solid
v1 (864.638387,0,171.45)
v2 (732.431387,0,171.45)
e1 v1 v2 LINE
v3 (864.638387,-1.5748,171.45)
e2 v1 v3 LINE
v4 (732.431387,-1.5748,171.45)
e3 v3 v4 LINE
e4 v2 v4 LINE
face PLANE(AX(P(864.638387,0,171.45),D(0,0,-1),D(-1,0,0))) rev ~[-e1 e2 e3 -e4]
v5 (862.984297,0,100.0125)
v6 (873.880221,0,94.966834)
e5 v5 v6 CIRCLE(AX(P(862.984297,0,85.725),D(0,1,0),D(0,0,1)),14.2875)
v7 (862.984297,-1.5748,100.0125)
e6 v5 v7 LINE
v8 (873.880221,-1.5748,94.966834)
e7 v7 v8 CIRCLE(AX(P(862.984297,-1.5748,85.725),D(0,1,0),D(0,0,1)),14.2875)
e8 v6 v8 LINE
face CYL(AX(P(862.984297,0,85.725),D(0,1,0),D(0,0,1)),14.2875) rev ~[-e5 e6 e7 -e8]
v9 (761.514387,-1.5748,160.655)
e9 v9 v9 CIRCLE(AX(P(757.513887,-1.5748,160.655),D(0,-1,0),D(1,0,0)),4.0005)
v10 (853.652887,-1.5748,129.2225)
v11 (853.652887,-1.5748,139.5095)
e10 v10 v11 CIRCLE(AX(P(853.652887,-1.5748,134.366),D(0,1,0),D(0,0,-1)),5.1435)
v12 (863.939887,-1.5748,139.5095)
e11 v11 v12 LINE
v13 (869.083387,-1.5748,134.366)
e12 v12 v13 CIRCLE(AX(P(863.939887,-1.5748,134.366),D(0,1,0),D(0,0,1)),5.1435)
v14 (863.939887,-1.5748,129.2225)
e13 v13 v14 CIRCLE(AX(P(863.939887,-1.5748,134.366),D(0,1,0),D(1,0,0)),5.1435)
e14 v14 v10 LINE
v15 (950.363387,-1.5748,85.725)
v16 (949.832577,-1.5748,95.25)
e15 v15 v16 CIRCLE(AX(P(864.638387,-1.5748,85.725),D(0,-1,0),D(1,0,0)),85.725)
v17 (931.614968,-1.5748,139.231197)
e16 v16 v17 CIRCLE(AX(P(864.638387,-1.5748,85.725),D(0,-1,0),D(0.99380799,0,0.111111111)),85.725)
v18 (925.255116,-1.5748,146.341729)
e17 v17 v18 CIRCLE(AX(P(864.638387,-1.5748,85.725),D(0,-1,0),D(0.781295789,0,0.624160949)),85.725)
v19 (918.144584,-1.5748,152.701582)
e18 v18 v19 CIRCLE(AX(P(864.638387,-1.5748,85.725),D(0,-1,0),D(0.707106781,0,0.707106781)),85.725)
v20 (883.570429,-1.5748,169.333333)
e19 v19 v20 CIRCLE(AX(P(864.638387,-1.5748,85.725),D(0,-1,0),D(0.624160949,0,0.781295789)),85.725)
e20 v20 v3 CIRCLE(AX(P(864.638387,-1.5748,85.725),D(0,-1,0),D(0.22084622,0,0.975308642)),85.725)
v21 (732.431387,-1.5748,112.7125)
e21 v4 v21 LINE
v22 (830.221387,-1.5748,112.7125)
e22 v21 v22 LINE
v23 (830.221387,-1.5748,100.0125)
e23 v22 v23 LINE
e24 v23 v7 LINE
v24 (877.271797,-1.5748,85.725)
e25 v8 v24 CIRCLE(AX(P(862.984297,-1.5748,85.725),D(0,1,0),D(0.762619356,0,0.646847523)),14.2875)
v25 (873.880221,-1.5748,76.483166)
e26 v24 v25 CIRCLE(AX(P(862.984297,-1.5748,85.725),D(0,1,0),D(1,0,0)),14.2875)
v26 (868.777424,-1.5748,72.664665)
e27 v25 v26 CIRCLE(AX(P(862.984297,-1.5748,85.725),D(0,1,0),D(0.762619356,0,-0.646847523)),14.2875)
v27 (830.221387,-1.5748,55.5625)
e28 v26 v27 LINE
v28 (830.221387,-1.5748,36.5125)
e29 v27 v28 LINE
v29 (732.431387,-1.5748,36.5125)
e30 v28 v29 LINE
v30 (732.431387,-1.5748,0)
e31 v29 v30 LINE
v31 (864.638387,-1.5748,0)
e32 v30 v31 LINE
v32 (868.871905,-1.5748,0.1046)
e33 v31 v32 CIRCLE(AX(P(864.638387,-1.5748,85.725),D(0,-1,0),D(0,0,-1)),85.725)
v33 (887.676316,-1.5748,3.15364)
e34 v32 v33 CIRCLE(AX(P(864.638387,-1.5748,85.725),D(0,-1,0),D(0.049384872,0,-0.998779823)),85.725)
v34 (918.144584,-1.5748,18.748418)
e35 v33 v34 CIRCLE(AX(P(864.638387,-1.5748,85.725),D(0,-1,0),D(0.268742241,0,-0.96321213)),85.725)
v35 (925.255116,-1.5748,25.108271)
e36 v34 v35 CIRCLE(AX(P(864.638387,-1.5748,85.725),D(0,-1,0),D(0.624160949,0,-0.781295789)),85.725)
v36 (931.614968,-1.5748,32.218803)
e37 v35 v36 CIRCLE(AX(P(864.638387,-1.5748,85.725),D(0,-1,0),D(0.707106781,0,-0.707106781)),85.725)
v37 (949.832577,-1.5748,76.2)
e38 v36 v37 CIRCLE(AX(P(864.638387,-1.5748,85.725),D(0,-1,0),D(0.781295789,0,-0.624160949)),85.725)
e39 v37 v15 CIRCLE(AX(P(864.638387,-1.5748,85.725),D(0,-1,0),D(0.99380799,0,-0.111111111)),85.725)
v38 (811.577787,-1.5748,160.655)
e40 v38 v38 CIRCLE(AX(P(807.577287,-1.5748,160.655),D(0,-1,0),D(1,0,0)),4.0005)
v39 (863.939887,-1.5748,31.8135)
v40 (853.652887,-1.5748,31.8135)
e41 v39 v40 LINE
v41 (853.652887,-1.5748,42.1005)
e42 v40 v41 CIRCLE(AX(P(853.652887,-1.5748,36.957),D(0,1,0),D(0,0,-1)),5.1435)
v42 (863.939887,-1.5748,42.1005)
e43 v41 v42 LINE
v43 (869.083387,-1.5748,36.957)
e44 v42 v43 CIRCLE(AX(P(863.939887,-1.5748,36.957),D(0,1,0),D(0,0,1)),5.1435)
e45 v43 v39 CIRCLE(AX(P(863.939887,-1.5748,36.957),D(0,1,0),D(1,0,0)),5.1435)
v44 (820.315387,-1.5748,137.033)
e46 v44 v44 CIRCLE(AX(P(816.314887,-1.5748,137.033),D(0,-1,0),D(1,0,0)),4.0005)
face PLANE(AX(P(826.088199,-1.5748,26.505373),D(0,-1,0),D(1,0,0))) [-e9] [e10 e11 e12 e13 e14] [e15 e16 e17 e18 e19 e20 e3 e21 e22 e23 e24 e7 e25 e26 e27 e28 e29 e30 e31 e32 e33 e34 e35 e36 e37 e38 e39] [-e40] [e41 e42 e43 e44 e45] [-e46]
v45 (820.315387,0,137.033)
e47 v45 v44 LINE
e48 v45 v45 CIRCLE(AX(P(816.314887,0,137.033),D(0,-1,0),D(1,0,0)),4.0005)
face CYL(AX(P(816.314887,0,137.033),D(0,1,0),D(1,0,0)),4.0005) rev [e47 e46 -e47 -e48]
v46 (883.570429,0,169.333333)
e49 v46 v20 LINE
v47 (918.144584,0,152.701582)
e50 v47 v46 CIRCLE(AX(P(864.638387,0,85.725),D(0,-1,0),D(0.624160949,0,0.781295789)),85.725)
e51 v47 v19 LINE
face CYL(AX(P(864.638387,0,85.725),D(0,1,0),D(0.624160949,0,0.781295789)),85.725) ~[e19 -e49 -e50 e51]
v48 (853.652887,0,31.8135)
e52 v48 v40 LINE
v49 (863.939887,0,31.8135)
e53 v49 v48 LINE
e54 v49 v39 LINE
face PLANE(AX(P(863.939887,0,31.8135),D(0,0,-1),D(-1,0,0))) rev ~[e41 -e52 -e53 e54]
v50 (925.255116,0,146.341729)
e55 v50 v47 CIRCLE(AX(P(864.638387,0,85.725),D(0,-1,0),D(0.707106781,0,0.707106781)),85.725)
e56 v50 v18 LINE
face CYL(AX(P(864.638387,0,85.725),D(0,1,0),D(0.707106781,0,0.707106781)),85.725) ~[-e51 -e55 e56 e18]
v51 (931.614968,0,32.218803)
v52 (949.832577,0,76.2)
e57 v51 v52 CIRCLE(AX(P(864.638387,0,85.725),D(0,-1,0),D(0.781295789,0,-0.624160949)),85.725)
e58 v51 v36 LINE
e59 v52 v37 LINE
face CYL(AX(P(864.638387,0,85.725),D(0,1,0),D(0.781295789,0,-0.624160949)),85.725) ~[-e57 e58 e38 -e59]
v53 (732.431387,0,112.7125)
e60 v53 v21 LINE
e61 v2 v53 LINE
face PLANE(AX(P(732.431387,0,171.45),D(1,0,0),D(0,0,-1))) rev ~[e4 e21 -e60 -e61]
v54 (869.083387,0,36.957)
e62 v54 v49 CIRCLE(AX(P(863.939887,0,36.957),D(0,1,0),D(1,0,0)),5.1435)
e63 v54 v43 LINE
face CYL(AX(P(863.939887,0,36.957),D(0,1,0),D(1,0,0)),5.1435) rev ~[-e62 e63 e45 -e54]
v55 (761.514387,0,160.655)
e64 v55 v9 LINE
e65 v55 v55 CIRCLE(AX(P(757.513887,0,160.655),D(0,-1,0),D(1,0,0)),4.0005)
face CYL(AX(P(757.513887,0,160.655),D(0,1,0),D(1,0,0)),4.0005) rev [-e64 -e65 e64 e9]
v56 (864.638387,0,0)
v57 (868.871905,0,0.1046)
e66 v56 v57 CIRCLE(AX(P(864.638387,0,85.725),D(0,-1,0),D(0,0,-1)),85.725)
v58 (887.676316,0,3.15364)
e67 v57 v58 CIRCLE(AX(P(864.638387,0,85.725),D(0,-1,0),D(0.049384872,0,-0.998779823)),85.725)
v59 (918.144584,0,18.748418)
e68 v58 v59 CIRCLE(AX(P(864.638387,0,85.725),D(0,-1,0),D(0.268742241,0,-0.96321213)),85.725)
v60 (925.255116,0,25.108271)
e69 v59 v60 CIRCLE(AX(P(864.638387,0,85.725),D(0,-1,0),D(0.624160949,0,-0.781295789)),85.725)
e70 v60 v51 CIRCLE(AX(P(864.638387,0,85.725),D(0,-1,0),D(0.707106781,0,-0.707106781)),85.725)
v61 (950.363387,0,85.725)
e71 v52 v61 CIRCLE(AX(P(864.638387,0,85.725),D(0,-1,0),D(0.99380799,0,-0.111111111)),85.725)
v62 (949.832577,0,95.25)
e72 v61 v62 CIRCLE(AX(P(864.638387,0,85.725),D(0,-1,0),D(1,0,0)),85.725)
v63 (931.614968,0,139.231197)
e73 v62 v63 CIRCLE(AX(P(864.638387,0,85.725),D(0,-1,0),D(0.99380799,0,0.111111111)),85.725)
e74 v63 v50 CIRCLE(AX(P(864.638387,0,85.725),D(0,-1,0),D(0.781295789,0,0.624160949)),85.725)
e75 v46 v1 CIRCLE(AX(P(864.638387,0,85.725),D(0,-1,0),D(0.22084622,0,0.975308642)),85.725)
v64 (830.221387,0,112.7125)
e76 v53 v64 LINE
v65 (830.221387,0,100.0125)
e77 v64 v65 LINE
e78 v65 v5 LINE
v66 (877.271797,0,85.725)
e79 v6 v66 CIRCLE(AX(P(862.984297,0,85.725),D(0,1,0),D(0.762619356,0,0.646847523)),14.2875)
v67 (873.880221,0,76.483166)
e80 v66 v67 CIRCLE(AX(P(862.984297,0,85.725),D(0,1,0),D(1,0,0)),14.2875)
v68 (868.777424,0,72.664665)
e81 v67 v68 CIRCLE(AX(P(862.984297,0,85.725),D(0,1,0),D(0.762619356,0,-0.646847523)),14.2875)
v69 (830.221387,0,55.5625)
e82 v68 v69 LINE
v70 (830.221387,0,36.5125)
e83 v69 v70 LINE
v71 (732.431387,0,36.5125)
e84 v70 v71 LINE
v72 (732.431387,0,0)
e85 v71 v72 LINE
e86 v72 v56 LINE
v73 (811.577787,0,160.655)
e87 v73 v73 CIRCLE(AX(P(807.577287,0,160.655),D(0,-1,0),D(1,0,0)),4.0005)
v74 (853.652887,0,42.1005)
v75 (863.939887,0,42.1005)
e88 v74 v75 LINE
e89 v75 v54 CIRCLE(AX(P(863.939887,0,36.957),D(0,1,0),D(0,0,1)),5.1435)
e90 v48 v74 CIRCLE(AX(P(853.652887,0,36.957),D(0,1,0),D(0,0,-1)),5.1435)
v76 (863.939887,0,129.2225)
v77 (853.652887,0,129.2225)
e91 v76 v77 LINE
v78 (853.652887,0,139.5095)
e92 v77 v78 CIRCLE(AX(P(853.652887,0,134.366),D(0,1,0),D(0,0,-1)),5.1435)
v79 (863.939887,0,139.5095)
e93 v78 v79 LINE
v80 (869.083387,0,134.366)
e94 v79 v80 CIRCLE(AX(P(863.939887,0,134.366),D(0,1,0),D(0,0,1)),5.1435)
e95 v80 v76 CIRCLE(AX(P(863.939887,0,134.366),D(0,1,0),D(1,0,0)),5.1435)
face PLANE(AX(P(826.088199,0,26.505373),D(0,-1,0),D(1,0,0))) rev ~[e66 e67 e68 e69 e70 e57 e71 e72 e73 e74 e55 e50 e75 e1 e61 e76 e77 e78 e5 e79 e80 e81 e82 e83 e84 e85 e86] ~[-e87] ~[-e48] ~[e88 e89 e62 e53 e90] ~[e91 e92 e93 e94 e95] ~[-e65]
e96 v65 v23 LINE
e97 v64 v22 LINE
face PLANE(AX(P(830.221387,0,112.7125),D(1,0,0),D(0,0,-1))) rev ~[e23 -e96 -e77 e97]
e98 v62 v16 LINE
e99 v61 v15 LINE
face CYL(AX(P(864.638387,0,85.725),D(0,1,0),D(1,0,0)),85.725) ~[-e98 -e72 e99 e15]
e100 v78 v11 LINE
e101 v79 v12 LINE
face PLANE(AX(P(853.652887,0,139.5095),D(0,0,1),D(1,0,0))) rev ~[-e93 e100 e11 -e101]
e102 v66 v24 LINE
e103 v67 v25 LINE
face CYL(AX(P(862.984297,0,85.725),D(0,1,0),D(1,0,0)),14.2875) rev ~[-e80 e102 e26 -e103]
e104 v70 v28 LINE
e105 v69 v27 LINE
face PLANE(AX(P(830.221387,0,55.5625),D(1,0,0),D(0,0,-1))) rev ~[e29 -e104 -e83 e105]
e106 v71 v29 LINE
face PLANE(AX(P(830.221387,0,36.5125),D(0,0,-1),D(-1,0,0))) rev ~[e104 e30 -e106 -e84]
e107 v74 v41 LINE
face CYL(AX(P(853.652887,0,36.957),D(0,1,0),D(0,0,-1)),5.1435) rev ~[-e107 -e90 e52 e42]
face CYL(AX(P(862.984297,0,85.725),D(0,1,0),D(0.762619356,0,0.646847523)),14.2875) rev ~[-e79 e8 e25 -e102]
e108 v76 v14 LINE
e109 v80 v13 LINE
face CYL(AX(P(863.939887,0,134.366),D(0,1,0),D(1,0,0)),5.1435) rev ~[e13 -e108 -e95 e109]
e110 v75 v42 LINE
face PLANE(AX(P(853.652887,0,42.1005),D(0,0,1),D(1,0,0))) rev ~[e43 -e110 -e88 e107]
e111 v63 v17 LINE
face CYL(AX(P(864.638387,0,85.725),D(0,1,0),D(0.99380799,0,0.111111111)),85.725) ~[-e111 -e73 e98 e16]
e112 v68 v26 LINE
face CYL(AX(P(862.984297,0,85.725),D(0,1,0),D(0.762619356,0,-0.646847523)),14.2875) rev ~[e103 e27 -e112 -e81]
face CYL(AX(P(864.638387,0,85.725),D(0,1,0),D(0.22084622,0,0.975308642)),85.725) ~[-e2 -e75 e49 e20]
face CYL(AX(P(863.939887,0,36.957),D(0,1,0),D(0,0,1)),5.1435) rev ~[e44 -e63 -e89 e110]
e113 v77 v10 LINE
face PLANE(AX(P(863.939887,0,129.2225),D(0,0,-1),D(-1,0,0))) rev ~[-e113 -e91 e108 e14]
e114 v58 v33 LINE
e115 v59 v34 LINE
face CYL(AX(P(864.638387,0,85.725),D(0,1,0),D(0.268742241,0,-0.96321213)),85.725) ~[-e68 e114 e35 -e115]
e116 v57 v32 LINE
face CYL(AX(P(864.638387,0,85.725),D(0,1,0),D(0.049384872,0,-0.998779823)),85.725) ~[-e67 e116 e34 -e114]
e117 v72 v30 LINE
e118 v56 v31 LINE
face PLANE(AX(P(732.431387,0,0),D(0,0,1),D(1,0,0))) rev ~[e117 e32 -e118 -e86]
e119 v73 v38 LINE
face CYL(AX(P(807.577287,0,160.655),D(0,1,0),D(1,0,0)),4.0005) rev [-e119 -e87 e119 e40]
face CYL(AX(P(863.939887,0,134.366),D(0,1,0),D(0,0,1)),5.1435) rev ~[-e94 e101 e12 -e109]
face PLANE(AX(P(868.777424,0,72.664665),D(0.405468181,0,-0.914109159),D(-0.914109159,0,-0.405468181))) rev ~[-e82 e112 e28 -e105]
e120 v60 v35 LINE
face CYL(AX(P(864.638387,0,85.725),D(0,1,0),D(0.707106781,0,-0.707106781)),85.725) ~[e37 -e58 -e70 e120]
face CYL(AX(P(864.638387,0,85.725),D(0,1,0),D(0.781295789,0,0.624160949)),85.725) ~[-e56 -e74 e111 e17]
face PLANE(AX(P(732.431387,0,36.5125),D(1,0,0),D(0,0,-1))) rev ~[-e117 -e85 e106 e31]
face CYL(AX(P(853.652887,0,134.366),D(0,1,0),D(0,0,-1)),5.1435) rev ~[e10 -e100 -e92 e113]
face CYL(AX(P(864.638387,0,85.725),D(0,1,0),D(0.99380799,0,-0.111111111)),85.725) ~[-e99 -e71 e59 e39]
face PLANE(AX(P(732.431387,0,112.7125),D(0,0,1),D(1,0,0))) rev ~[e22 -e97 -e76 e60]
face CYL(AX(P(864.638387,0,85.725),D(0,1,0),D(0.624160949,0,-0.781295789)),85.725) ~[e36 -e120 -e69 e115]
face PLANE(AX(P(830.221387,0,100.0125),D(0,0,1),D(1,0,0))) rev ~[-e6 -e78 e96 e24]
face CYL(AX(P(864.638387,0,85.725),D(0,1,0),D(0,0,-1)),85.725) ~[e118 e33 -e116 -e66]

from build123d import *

# Parameters (mm, degrees)
F0_R     = 4.0005
F1_DEPTH = 1.5748


with BuildPart() as f1:
    # F0 (on Front) → F1 (new body)
    with BuildSketch(Plane.XZ):
        with BuildLine():
            Line((732.4313869209, 36.5125), (732.4313869209, 0))
            Line((732.4313869209, 0), (864.6383869209, 0))
            ThreePointArc((864.6383869209, 0), (866.7557920134, 0.0261539128), (868.8719051041, 0.1045996926))
            ThreePointArc((868.8719051041, 0.1045996926), (878.3590689291, 1.1051529768), (887.6763155537, 3.1536401389))
            ThreePointArc((887.6763155537, 3.1536401389), (903.696677756, 9.4149381337), (918.1445842563, 18.748418483))
            ThreePointArc((918.1445842563, 18.748418483), (921.7883869209, 21.8293575429), (925.2551157381, 25.1082711828))
            Line((925.2551157381, 25.1082711828), (873.8802209099, 76.483166011))
            ThreePointArc((873.8802209099, 76.483166011), (871.5444569052, 74.2857554291), (868.7774235028, 72.664665394))
            Line((868.7774235028, 72.664665394), (830.2213869209, 55.5625))
            Line((830.2213869209, 55.5625), (830.2213869209, 36.5125))
            Line((830.2213869209, 36.5125), (747.6713869209, 36.5125))
            Line((747.6713869209, 36.5125), (732.4313869209, 36.5125))
        make_face()
        with BuildLine():
            ThreePointArc((853.6528869209, 31.8135), (848.5093869209, 36.957), (853.6528869209, 42.1005))
            Line((853.6528869209, 42.1005), (863.9398869209, 42.1005))
            ThreePointArc((863.9398869209, 42.1005), (867.57689065, 40.594003729), (869.0833869209, 36.957))
            ThreePointArc((869.0833869209, 36.957), (867.57689065, 33.319996271), (863.9398869209, 31.8135))
            Line((863.9398869209, 31.8135), (853.6528869209, 31.8135))
        make_face(mode=Mode.SUBTRACT)
        with BuildLine():
            Line((732.4313869209, 112.7125), (747.6713869209, 112.7125))
            Line((747.6713869209, 112.7125), (830.2213869209, 112.7125))
            Line((830.2213869209, 112.7125), (830.2213869209, 100.0125))
            Line((830.2213869209, 100.0125), (862.984296866, 100.0125))
            ThreePointArc((862.984296866, 100.0125), (868.9880437433, 98.6898632728), (873.8802209099, 94.966833989))
            Line((873.8802209099, 94.966833989), (925.2551157381, 146.3417288172))
            ThreePointArc((925.2551157381, 146.3417288172), (921.7883869209, 149.6206424571), (918.1445842563, 152.701581517))
            ThreePointArc((918.1445842563, 152.701581517), (901.799905044, 162.9765190517), (883.5704291304, 169.3333333333))
            ThreePointArc((883.5704291304, 169.3333333333), (874.1633869209, 170.9191899427), (864.6383869209, 171.45))
            Line((864.6383869209, 171.45), (858.2883869209, 171.45))
            Line((858.2883869209, 171.45), (839.2383869209, 171.45))
            Line((839.2383869209, 171.45), (749.5336282768, 171.45))
            Line((749.5336282768, 171.45), (732.4313869209, 171.45))
            Line((732.4313869209, 171.45), (732.4313869209, 112.7125))
        make_face()
        with Locations((816.3148869209, 137.033)):
            Circle(F0_R, mode=Mode.SUBTRACT)
        with BuildLine():
            ThreePointArc((853.6528869209, 129.2225), (848.5093869209, 134.366), (853.6528869209, 139.5095))
            Line((853.6528869209, 139.5095), (863.9398869209, 139.5095))
            ThreePointArc((863.9398869209, 139.5095), (867.57689065, 138.003003729), (869.0833869209, 134.366))
            ThreePointArc((869.0833869209, 134.366), (867.57689065, 130.728996271), (863.9398869209, 129.2225))
            Line((863.9398869209, 129.2225), (853.6528869209, 129.2225))
        make_face(mode=Mode.SUBTRACT)
        with Locations((757.5138869209, 160.655)):
            Circle(F0_R, mode=Mode.SUBTRACT)
        with Locations((807.5772869209, 160.655)):
            Circle(F0_R, mode=Mode.SUBTRACT)
        with BuildLine():
            Line((873.8802209099, 76.483166011), (925.2551157381, 25.1082711828))
            ThreePointArc((925.2551157381, 25.1082711828), (928.534029378, 28.575), (931.6149684379, 32.2188026646))
            ThreePointArc((931.6149684379, 32.2188026646), (943.8379598455, 52.9194627605), (949.8325768637, 76.2))
            ThreePointArc((949.8325768637, 76.2), (950.2305815354, 80.9551104752), (950.3633869209, 85.725))
            Line((950.3633869209, 85.725), (877.271796866, 85.725))
            ThreePointArc((877.271796866, 85.725), (876.3971297328, 80.8027473921), (873.8802209099, 76.483166011))
        make_face()
        with BuildLine():
            ThreePointArc((873.8802209099, 94.966833989), (876.3971297328, 90.6472526079), (877.271796866, 85.725))
            Line((877.271796866, 85.725), (950.3633869209, 85.725))
            ThreePointArc((950.3633869209, 85.725), (950.2305815354, 90.4948895248), (949.8325768637, 95.25))
            ThreePointArc((949.8325768637, 95.25), (943.8379598455, 118.5305372395), (931.6149684379, 139.2311973354))
            ThreePointArc((931.6149684379, 139.2311973354), (928.534029378, 142.875), (925.2551157381, 146.3417288172))
            Line((925.2551157381, 146.3417288172), (873.8802209099, 94.966833989))
        make_face()
    extrude(amount=F1_DEPTH)


solid = f1.part
